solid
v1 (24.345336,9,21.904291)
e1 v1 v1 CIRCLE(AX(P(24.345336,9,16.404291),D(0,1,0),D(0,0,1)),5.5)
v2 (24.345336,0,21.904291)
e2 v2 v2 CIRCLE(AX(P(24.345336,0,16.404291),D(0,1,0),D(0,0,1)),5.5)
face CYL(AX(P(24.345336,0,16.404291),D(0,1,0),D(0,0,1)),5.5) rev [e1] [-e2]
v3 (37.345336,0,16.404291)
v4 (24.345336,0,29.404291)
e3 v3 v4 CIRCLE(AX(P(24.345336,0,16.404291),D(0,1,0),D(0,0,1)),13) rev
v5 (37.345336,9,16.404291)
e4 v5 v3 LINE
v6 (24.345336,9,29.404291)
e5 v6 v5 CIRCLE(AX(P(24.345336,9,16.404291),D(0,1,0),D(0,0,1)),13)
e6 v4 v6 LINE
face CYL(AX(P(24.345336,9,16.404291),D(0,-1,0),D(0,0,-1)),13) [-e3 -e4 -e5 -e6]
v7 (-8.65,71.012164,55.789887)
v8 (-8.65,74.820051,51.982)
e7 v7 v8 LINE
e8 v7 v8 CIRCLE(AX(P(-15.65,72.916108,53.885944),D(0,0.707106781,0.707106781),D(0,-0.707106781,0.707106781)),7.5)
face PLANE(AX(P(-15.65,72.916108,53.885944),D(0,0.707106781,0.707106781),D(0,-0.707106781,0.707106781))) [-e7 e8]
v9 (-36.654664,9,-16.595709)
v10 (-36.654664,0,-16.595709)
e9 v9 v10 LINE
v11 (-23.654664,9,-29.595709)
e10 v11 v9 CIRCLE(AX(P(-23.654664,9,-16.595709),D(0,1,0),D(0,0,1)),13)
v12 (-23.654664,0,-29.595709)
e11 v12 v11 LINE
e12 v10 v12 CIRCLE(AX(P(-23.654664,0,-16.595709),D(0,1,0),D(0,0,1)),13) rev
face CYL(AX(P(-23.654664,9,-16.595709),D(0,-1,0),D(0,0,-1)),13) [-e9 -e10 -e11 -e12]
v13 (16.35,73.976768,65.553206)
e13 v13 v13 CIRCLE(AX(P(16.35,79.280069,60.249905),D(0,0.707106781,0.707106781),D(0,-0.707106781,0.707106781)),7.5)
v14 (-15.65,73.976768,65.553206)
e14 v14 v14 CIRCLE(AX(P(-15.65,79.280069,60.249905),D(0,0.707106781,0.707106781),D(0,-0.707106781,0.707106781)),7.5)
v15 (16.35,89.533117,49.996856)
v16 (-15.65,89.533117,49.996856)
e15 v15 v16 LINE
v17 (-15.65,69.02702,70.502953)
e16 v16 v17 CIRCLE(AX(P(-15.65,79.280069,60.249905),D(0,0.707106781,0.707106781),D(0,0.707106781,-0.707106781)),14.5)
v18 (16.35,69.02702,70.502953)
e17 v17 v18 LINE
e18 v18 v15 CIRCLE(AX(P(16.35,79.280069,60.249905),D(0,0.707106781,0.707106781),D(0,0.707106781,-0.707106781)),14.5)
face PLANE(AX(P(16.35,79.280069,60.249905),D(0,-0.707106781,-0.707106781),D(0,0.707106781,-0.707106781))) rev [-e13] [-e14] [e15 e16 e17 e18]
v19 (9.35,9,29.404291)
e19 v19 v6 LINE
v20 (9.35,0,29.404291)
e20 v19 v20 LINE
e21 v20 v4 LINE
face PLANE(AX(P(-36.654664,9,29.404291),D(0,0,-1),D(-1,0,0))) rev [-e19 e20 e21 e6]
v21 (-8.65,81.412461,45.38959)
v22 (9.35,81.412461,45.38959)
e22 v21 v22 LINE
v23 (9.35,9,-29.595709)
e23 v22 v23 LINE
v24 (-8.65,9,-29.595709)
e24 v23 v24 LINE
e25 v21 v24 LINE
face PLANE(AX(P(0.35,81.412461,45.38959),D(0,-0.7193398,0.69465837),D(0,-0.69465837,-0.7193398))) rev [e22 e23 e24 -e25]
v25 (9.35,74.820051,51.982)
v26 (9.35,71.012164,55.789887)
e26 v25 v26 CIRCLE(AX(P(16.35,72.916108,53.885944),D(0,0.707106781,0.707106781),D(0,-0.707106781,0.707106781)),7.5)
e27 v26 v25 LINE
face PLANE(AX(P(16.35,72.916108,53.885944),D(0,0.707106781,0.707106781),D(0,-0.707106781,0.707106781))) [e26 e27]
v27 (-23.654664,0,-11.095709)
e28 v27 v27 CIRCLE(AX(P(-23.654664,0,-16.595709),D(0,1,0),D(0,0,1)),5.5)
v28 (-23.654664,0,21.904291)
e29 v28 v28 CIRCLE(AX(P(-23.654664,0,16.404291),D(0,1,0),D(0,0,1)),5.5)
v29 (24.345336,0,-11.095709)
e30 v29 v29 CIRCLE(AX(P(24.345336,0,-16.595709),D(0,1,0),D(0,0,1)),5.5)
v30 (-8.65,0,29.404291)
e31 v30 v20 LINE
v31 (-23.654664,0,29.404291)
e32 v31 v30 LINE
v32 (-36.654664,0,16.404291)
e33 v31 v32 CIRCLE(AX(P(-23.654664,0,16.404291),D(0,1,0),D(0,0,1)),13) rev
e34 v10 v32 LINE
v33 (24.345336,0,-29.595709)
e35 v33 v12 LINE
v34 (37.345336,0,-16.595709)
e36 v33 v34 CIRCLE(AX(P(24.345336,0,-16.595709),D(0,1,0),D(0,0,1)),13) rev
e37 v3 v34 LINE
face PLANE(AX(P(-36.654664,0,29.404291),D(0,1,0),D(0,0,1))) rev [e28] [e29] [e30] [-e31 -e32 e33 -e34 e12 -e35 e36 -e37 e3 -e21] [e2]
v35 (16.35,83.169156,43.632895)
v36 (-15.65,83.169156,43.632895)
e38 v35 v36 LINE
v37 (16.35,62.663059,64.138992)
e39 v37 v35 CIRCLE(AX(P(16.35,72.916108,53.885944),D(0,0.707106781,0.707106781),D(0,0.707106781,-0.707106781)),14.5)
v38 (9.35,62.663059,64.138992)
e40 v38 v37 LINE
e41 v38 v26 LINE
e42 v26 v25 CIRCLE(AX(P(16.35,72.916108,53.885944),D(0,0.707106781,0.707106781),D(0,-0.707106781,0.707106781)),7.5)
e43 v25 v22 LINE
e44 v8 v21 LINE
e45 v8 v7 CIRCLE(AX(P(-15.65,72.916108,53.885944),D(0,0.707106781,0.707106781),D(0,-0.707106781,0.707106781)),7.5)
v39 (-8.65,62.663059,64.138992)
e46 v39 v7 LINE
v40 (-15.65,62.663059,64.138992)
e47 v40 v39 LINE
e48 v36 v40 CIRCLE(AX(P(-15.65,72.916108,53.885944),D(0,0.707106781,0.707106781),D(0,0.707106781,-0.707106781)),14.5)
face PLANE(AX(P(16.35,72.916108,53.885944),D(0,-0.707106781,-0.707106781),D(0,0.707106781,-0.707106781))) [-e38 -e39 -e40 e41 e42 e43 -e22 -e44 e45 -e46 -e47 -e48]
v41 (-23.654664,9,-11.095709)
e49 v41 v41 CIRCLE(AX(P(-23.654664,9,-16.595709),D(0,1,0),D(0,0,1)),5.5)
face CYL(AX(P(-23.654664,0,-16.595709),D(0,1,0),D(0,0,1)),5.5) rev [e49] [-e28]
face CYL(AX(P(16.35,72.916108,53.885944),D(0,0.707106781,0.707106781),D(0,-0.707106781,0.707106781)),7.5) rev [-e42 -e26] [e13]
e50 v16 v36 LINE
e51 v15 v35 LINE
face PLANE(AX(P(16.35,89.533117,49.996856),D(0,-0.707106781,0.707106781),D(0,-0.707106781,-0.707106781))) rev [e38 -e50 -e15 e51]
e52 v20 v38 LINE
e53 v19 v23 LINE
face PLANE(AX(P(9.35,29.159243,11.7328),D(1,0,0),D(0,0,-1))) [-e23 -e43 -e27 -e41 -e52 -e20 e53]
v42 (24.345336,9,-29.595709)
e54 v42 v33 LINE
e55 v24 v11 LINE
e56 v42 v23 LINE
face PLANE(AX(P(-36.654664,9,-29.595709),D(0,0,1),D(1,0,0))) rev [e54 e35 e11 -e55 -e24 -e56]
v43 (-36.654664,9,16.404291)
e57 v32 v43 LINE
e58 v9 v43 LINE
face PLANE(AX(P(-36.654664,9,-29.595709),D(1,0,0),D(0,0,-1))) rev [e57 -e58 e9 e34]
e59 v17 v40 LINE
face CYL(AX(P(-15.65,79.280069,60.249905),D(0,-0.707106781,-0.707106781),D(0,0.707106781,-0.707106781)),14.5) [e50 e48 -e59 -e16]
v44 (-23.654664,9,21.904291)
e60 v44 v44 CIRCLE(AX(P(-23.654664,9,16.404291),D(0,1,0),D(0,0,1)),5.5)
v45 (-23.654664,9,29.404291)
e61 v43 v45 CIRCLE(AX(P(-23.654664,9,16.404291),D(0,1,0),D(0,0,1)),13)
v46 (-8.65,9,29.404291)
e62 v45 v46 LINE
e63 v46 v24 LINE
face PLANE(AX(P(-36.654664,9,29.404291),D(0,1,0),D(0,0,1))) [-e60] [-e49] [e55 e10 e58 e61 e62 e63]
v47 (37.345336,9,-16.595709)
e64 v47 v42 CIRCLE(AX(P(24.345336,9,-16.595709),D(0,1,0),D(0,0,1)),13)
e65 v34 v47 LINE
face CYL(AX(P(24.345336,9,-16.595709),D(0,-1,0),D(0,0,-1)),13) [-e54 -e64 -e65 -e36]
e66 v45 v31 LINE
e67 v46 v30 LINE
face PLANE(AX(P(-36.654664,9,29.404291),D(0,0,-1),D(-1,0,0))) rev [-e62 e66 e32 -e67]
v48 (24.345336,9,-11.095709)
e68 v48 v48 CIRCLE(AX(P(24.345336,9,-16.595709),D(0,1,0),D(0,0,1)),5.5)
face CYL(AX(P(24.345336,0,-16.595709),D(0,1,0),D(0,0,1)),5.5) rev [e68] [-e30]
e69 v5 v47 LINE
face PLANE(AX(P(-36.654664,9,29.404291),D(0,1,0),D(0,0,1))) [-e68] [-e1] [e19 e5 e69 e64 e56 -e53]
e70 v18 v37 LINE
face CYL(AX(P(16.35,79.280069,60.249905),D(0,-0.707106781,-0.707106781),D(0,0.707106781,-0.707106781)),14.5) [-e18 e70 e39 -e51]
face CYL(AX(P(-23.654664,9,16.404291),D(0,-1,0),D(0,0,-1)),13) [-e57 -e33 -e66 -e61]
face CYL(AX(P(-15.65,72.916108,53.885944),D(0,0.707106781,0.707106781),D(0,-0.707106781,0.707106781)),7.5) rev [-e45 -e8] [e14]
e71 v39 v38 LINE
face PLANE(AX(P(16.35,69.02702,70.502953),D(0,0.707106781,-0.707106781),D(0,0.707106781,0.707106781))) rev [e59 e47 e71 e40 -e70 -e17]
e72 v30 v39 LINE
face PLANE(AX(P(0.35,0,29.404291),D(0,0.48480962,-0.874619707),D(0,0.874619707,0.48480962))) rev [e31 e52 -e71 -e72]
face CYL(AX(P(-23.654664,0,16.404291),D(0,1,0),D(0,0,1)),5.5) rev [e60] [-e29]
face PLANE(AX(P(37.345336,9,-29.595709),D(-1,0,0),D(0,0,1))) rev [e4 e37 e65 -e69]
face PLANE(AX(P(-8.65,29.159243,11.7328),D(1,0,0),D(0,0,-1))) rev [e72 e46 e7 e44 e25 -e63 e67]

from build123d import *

# Parameters (mm, degrees)
SKETCH1_W            = 74
SKETCH1_H            = 59
EXTRUDE1_DEPTH       = 9
SKETCH2_R            = 5.5
CUT_EXTRUDE1_DEPTH   = 49.493093283
LPATTERN1_COUNT      = 2
LPATTERN1_PITCH      = 48
LPATTERN1_COUNT_DIR2 = 2
LPATTERN1_PITCH_DIR2 = 33
RIB2_START           = -9
RIB2_DEPTH           = 18
EXTRUDE2_DEPTH       = 9
SKETCH7_R            = 7.5
CUT_EXTRUDE2_DEPTH   = 9
FILLET8_R            = 13


# Read off the part's stored shape, not the designer's step: Rib2
with BuildPart() as part:
    # Sketch1 → Extrude1 (new body)
    with BuildSketch(Plane(origin=(0, 0, 0), x_dir=(1, 0, 0), z_dir=(0, 1, 0))):
        with Locations((0.345335821, 0.095708955)):
            Rectangle(SKETCH1_W, SKETCH1_H)
    extrude(amount=EXTRUDE1_DEPTH)

    # Sketch2 → Cut-Extrude1 (cut, through all)
    with BuildSketch(Plane(origin=(0, 9, 0), x_dir=(-1, 0, 0), z_dir=(0, 1, 0))):
        with Locations(Location((23.654664179, -16.595708955, 0), (0, 0, 90))):
            Circle(SKETCH2_R)
    cut_extrude1 = extrude(amount=-CUT_EXTRUDE1_DEPTH, mode=Mode.SUBTRACT)

    # LPattern1: Cut-Extrude1 2 × 2
    with Locations(*[(i * LPATTERN1_PITCH, 0, j * LPATTERN1_PITCH_DIR2) for i in range(LPATTERN1_COUNT) for j in range(LPATTERN1_COUNT_DIR2) if (i, j) != (0, 0)]):
        add(cut_extrude1, mode=Mode.SUBTRACT)

    # Rib2 outline → Rib2 (add)
    with BuildSketch(Plane(origin=(0.35, 0, 0), x_dir=(0, 0, -1), z_dir=(1, 0, 0)).offset(RIB2_START)):
        Polygon((29.595708955, 9), (-45.389590013, 81.412461489), (-64.138992076, 62.663059426), (-29.404291045, 0), (-29.404291045, 9), align=None)
    extrude(amount=RIB2_DEPTH)

    # Sketch6 → Extrude2 (add)
    with BuildSketch(Plane(origin=(0, 63.401025751, 63.401025751), x_dir=(1, 0, 0), z_dir=(0, 0.7071067811865438, 0.7071067811865513))):
        with BuildLine():
            Line((16.35, 27.956358014), (-15.65, 27.956358014))
            ThreePointArc((-15.65, 27.956358014), (-30.15, 13.456358014), (-15.65, -1.043641986))
            Line((-15.65, -1.043641986), (16.35, -1.043641986))
            ThreePointArc((16.35, -1.043641986), (30.85, 13.456358014), (16.35, 27.956358014))
        make_face()
    extrude(amount=EXTRUDE2_DEPTH)

    # Sketch7 → Cut-Extrude2 (cut)
    with BuildSketch(Plane(origin=(0, 69.764986782, 69.764986782), x_dir=(1, 0, 0), z_dir=(0, 0.7071067811865438, 0.7071067811865512))):
        with Locations(Location((16.35, 13.456358014, 0), (0, 0, 270))):
            Circle(SKETCH7_R)
        with Locations(Location((-15.65, 13.456358014, 0), (0, 0, 270))):
            Circle(SKETCH7_R)
    extrude(amount=-CUT_EXTRUDE2_DEPTH, mode=Mode.SUBTRACT)

    # Fillet8
    fillet8_edges = [part.edges().sort_by_distance(p)[0] for p in [
        (-36.654664179, 4.5, -29.595708955),
        (37.345335821, 4.5, -29.595708955),
        (37.345335821, 4.5, 29.404291045),
        (-36.654664179, 4.5, 29.404291045),
    ]]
    fillet(fillet8_edges, radius=FILLET8_R)


solid = part.part
